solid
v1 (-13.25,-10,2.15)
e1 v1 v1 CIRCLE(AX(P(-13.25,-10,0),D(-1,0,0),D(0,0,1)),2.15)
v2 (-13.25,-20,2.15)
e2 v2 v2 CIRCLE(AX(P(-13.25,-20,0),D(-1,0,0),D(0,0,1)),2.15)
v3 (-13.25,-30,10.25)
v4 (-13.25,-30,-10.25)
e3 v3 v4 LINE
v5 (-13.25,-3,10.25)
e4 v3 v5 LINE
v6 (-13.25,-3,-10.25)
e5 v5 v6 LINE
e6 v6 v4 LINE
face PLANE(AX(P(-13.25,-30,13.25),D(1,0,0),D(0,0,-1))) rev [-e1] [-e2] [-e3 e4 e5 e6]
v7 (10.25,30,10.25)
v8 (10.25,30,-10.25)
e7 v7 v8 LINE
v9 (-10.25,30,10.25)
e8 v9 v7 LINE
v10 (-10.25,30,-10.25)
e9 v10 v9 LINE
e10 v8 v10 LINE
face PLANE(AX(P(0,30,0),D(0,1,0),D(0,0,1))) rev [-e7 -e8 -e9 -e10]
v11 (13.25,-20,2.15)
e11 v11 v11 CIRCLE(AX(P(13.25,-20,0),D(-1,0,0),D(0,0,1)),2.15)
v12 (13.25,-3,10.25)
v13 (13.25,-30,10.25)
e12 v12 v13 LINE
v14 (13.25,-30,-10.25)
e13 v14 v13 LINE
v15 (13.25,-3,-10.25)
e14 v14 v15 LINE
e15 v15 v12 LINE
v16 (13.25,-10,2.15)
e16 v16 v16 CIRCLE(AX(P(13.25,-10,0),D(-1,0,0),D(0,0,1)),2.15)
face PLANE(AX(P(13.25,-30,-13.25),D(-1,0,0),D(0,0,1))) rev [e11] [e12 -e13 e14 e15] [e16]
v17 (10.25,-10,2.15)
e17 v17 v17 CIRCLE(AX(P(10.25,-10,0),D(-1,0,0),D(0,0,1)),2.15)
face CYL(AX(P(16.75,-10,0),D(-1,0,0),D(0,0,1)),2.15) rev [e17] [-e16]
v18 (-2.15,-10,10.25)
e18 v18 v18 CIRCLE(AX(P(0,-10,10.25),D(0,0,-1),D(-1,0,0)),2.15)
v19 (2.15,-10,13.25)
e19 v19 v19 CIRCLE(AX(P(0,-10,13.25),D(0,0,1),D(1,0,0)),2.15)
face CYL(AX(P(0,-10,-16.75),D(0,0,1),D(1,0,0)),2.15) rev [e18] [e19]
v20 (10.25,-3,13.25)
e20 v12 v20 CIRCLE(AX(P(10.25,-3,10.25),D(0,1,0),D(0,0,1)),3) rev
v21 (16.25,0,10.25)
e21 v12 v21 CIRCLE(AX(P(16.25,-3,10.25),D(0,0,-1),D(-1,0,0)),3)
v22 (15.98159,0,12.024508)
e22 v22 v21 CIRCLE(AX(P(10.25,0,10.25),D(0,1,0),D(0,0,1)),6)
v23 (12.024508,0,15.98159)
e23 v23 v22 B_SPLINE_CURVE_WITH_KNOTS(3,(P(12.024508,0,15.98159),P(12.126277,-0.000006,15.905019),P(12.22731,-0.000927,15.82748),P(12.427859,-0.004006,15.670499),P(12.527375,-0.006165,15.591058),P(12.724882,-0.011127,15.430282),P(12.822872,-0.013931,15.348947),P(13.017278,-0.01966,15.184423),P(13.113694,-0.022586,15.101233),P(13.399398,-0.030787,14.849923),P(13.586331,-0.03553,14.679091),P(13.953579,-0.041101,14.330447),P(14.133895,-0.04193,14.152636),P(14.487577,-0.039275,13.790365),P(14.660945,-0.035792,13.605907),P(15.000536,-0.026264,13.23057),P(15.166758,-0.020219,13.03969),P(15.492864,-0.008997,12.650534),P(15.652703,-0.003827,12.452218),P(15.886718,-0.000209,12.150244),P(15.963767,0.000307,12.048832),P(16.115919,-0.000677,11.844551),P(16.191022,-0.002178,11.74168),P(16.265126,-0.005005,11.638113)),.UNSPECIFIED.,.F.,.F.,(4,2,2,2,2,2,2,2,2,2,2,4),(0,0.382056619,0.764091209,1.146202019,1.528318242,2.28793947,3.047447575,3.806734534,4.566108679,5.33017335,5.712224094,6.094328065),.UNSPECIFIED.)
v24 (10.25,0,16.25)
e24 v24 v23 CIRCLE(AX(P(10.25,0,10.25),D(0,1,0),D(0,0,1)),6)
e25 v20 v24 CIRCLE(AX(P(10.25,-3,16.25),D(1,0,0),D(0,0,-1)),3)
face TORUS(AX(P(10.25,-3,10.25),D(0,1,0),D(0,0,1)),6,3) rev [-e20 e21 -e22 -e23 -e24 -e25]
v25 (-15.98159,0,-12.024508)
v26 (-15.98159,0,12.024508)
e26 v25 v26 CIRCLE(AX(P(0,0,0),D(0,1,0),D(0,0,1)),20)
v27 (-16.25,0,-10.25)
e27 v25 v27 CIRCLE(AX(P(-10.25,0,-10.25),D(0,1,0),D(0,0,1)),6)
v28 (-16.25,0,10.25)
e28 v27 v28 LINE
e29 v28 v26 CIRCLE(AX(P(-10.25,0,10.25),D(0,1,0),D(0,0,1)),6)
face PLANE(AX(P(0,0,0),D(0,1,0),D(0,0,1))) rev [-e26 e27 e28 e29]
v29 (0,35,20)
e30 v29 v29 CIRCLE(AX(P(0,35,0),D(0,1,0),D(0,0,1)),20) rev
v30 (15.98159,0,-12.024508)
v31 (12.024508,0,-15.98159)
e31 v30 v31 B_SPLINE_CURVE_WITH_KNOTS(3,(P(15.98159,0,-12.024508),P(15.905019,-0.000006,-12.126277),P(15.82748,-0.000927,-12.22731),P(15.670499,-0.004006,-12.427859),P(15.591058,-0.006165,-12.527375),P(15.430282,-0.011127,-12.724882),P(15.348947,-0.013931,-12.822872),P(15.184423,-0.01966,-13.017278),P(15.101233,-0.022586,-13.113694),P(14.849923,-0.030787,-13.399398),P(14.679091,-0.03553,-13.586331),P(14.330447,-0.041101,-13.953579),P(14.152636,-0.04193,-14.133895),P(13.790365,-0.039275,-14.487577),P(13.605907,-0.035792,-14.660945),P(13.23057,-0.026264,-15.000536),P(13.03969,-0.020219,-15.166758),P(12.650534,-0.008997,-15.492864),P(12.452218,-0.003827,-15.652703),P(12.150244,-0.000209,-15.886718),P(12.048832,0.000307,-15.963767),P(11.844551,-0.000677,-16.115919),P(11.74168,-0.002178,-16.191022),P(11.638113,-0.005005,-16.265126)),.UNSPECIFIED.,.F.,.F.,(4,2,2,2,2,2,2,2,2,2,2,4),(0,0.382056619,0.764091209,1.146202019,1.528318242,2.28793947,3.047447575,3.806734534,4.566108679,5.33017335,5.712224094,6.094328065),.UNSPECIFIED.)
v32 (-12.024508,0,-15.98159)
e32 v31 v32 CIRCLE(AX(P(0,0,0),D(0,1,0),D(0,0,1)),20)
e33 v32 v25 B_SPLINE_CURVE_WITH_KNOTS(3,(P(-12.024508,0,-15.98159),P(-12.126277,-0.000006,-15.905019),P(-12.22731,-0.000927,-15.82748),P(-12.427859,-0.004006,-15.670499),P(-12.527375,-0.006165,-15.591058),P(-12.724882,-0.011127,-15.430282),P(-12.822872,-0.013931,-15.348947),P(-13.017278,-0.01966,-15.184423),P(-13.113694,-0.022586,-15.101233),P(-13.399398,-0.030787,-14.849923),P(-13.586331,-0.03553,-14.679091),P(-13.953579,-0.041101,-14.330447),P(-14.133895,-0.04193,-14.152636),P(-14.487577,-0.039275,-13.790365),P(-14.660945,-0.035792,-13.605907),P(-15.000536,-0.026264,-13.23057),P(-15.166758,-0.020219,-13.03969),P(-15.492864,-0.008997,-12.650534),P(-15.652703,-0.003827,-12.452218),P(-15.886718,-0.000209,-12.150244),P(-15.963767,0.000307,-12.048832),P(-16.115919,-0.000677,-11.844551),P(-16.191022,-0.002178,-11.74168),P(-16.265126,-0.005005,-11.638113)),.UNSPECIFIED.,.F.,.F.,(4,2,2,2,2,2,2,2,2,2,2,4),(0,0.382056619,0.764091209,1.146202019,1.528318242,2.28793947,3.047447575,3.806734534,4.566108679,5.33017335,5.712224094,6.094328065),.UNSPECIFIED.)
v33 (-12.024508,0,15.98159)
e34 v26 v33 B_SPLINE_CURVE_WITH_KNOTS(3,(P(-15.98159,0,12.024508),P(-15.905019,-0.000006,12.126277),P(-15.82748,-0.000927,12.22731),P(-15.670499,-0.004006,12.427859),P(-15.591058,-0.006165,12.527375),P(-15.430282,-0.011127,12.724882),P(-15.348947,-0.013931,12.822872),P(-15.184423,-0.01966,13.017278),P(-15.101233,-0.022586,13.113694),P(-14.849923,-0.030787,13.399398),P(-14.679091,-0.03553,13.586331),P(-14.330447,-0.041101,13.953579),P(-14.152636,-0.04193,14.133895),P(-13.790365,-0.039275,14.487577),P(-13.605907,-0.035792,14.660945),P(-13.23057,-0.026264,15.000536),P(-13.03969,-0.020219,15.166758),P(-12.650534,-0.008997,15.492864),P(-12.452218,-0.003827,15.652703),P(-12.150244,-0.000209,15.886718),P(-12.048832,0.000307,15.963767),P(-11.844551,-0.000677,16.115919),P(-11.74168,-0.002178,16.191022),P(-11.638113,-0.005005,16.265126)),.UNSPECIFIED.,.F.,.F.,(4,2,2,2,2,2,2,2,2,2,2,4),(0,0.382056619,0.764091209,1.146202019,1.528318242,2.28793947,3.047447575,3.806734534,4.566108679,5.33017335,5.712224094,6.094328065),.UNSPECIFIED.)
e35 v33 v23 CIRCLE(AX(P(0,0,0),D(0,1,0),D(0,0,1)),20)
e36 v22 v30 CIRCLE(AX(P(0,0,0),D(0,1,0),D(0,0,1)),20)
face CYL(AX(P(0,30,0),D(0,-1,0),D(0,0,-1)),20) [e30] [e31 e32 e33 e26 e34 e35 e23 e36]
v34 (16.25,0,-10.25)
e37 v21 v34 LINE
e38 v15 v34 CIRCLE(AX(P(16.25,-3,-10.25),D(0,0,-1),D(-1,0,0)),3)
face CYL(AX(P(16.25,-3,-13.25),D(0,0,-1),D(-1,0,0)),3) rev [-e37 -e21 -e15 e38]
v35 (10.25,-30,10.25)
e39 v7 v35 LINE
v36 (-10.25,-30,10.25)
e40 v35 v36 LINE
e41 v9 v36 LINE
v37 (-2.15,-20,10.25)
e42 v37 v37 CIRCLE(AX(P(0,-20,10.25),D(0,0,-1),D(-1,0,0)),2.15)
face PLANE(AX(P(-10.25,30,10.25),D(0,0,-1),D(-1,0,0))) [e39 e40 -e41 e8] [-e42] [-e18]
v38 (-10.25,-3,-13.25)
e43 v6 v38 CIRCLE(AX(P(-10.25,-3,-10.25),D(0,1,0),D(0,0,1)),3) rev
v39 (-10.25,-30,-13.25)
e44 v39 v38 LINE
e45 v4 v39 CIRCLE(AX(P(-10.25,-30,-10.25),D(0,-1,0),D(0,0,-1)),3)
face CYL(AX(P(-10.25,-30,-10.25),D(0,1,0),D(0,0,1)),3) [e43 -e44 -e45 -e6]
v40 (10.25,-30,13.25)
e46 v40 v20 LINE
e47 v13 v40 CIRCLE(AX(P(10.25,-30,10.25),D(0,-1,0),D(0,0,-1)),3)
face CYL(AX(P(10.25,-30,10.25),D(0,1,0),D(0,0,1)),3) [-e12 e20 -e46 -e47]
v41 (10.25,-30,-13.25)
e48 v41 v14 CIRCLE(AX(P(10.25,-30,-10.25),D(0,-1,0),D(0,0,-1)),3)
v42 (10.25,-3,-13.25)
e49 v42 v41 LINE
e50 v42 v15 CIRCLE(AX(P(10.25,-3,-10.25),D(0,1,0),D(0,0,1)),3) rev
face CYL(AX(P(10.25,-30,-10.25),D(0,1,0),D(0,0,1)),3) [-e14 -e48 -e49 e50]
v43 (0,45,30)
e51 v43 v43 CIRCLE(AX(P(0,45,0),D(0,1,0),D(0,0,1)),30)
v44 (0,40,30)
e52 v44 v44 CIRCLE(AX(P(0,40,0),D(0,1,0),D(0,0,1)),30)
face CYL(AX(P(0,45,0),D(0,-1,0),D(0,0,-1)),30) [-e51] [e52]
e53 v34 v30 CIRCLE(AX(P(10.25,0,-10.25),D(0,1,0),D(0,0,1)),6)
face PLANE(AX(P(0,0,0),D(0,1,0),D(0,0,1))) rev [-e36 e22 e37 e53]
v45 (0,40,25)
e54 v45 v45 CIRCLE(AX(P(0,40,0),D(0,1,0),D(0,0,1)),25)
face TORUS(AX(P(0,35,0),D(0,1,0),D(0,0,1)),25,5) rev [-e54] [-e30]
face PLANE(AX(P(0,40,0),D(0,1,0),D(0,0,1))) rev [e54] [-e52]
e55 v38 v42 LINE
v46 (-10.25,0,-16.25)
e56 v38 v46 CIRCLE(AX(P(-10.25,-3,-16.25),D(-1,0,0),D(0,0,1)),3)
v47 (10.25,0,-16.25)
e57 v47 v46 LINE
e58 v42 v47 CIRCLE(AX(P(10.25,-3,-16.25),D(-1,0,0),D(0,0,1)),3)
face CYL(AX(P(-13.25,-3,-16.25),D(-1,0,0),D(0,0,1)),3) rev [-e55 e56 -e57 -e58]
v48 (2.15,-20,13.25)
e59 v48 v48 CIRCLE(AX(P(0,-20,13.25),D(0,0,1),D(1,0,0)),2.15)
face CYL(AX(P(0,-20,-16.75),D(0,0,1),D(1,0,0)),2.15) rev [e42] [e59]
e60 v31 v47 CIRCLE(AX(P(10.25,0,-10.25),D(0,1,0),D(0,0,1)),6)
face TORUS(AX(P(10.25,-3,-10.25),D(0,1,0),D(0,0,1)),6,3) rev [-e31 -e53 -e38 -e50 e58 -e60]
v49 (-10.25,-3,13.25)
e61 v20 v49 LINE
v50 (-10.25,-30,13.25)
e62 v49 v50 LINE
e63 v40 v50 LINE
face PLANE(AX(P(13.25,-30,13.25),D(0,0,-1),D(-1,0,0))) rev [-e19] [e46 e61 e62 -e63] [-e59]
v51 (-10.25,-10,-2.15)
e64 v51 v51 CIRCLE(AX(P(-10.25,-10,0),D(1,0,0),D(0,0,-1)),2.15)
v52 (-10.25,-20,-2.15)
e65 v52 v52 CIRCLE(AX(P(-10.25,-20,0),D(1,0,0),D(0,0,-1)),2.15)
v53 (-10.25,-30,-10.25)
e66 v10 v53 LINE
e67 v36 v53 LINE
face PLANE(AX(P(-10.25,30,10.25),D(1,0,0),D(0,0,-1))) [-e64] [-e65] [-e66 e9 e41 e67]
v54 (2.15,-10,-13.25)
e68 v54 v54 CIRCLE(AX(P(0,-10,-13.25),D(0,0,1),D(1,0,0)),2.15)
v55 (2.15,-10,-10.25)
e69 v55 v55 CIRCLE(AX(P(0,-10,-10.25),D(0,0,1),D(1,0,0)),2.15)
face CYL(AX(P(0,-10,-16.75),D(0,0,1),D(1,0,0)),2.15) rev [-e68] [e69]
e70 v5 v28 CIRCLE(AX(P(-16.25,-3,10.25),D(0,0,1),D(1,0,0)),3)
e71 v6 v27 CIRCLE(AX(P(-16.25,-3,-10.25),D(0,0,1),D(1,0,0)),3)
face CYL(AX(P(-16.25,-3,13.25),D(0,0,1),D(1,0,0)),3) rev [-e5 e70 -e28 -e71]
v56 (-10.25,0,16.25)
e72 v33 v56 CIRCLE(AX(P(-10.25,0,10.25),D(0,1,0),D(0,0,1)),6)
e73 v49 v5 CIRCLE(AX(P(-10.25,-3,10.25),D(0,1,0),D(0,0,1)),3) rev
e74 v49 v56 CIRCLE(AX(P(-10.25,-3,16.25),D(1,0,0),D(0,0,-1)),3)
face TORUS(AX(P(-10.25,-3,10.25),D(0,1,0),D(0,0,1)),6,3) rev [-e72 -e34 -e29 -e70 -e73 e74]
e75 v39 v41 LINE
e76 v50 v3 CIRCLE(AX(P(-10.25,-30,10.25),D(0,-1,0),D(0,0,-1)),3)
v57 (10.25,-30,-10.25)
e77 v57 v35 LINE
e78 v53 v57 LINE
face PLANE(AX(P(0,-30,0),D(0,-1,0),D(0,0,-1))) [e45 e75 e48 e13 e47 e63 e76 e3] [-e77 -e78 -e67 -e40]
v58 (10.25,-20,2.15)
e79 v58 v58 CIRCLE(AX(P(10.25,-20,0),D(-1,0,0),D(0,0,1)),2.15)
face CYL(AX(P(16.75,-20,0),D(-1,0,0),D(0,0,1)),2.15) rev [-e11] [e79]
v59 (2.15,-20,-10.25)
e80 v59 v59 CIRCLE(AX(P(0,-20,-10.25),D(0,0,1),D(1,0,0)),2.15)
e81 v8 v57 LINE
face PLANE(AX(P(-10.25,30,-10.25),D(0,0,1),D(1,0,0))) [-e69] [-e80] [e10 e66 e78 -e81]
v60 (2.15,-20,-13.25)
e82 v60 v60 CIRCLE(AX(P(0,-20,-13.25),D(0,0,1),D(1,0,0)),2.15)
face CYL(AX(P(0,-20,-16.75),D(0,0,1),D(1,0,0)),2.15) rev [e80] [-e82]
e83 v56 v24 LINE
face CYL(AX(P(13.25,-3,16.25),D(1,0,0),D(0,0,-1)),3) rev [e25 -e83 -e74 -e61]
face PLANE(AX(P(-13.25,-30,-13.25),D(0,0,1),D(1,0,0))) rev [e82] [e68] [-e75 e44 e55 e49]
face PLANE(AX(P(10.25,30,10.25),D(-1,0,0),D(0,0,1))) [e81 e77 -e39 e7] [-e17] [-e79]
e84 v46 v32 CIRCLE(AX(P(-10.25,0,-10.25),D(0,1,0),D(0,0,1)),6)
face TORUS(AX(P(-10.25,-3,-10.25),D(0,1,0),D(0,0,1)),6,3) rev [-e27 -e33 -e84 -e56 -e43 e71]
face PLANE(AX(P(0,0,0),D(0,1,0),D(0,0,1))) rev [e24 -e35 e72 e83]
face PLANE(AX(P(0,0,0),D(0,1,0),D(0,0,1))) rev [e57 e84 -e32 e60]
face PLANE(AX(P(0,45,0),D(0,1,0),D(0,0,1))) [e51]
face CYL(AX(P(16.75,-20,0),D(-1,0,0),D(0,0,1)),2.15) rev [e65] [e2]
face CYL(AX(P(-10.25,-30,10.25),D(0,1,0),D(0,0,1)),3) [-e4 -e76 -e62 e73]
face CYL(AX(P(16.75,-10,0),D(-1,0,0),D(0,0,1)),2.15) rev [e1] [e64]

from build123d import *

# Parameters (mm, degrees)
SKETCH_1_R          = 20
SKETCH_1_W          = 20.5
SKETCH_1_H          = 20.5
EXTRUDE_1_DEPTH     = 30
SKETCH_5_R          = 20
EXTRUDE_3_DEPTH     = 10
SKETCH_3_W          = 26.5
SKETCH_3_H          = 26.5
SKETCH_3_W_2        = 20.5
SKETCH_3_H_2        = 20.5
EXTRUDE_4_DEPTH     = 30
SKETCH_6_R          = 2.15
CUT_EXTRUDE_1_DEPTH = 30
SKETCH_7_R          = 2.15
CUT_EXTRUDE_2_DEPTH = 30
FILLET_1_R          = 3
FILLET_2_R          = 3
FILLET_3_R          = 3
FILLET_4_R          = 3
FILLET_5_R          = 3
SKETCH_11_R         = 30
EXTRUDE_5_DEPTH     = 5
FILLET_6_R          = 5


with BuildPart() as part:
    # 草图1 → 凸台-拉伸1 (new body)
    with BuildSketch(Plane(origin=(0, 0, 0), x_dir=(1, 0, 0), z_dir=(0, 1, 0))):
        with Locations(Location((0, 0, 0), (0, 0, 270))):
            Circle(SKETCH_1_R)
        Rectangle(SKETCH_1_W, SKETCH_1_H, mode=Mode.SUBTRACT)
    extrude(amount=EXTRUDE_1_DEPTH)

    # 草图5 → 凸台-拉伸3 (add)
    with BuildSketch(Plane(origin=(0, 30, 0), x_dir=(1, 0, 0), z_dir=(0, 1, 0))):
        with Locations(Location((0, 0, 0), (0, 0, 270))):
            Circle(SKETCH_5_R)
    extrude(amount=EXTRUDE_3_DEPTH)

    # 草图3 → 凸台-拉伸4 (add)
    with BuildSketch(Plane.XZ):
        Rectangle(SKETCH_3_W, SKETCH_3_H)
        Rectangle(SKETCH_3_W_2, SKETCH_3_H_2, mode=Mode.SUBTRACT)
    extrude(amount=EXTRUDE_4_DEPTH)

    # 草图6 → 切除-拉伸1 (cut)
    with BuildSketch(Plane.XY.offset(13.25)):
        with Locations((0, -10)):
            Circle(SKETCH_6_R)
        with Locations((0, -20)):
            Circle(SKETCH_6_R)
    extrude(amount=-CUT_EXTRUDE_1_DEPTH, mode=Mode.SUBTRACT)

    # 草图7 → 切除-拉伸2 (cut)
    with BuildSketch(Plane.ZY.offset(13.25)):
        with Locations((0, -10)):
            Circle(SKETCH_7_R)
        with Locations((0, -20)):
            Circle(SKETCH_7_R)
    extrude(amount=-CUT_EXTRUDE_2_DEPTH, mode=Mode.SUBTRACT)

    # 圆角1
    fillet_1_edges = [part.edges().sort_by_distance(p)[0] for p in [
        (-13.25, -15, 13.25),
    ]]
    fillet(fillet_1_edges, radius=FILLET_1_R)

    # 圆角2
    fillet_2_edges = [part.edges().sort_by_distance(p)[0] for p in [
        (13.25, -15, 13.25),
    ]]
    fillet(fillet_2_edges, radius=FILLET_2_R)

    # 圆角3
    fillet_3_edges = [part.edges().sort_by_distance(p)[0] for p in [
        (13.25, -15, -13.25),
    ]]
    fillet(fillet_3_edges, radius=FILLET_3_R)

    # 圆角4
    fillet_4_edges = [part.edges().sort_by_distance(p)[0] for p in [
        (-13.25, -15, -13.25),
    ]]
    fillet(fillet_4_edges, radius=FILLET_4_R)

    # 圆角5
    # the kernel refuses this fillet: 3 mm, written as the material it adds along each edge
    with BuildSketch(Plane(origin=(10.25, 0, 13.25), x_dir=(0, 0, 1), z_dir=(-1, 0, 0)), Plane(origin=(13.25, 0, -10.25), x_dir=(1, 0, 0), z_dir=(0, 0, 1)), Plane(origin=(-10.25, 0, -13.25), x_dir=(0, 0, -1), z_dir=(1, 0, 0)), Plane(origin=(-13.25, 0, 10.25), x_dir=(-1, 0, 0), z_dir=(0, 0, -1))) as fillet_5_piece_1:
        with BuildLine():
            CenterArc((FILLET_5_R, -FILLET_5_R), FILLET_5_R, 90, 90)
            Line((0, -FILLET_5_R), (0, 0))
            Line((0, 0), (FILLET_5_R, 0))
        make_face()
    extrude(amount=20.5)
    with BuildSketch(Plane(origin=(10.25, 0, 10.25), x_dir=(0, 0, 1), z_dir=(-1, 0, 0))) as fillet_5_piece_2_section:
        with BuildLine():
            CenterArc((3 + FILLET_5_R, -FILLET_5_R), FILLET_5_R, 90, 90)
            Line((3, -FILLET_5_R), (3, 0))
            Line((3, 0), (3 + FILLET_5_R, 0))
        make_face()
    fillet_5_piece_2 = revolve(axis=Axis((10.25, 0, 10.25), (0, 1, 0)), revolution_arc=90, mode=Mode.PRIVATE)
    fillet_5_piece_2 = fillet_5_piece_2 & Plane(origin=(0, -0.618331703, 0), x_dir=(0, 0, 1), z_dir=(0, -1, 0)) * Cylinder(20, 24, mode=Mode.PRIVATE)
    add(fillet_5_piece_2)
    with BuildSketch(Plane(origin=(10.25, 0, -10.25), x_dir=(1, 0, 0), z_dir=(0, 0, 1))) as fillet_5_piece_3_section:
        with BuildLine():
            CenterArc((3 + FILLET_5_R, -FILLET_5_R), FILLET_5_R, 90, 90)
            Line((3, -FILLET_5_R), (3, 0))
            Line((3, 0), (3 + FILLET_5_R, 0))
        make_face()
    fillet_5_piece_3 = revolve(axis=Axis((10.25, 0, -10.25), (0, 1, 0)), revolution_arc=90, mode=Mode.PRIVATE)
    fillet_5_piece_3 = fillet_5_piece_3 & Plane(origin=(0, -0.618331703, 0), x_dir=(0, 0, 1), z_dir=(0, -1, 0)) * Cylinder(20, 24, mode=Mode.PRIVATE)
    add(fillet_5_piece_3)
    with BuildSketch(Plane(origin=(-10.25, 0, -10.25), x_dir=(0, 0, -1), z_dir=(1, 0, 0))) as fillet_5_piece_4_section:
        with BuildLine():
            CenterArc((3 + FILLET_5_R, -FILLET_5_R), FILLET_5_R, 90, 90)
            Line((3, -FILLET_5_R), (3, 0))
            Line((3, 0), (3 + FILLET_5_R, 0))
        make_face()
    fillet_5_piece_4 = revolve(axis=Axis((-10.25, 0, -10.25), (0, 1, 0)), revolution_arc=90, mode=Mode.PRIVATE)
    fillet_5_piece_4 = fillet_5_piece_4 & Plane(origin=(0, -0.618331703, 0), x_dir=(0, 0, 1), z_dir=(0, -1, 0)) * Cylinder(20, 24, mode=Mode.PRIVATE)
    add(fillet_5_piece_4)
    with BuildSketch(Plane(origin=(-10.25, 0, 10.25), x_dir=(-1, 0, 0), z_dir=(0, 0, -1))) as fillet_5_piece_5_section:
        with BuildLine():
            CenterArc((3 + FILLET_5_R, -FILLET_5_R), FILLET_5_R, 90, 90)
            Line((3, -FILLET_5_R), (3, 0))
            Line((3, 0), (3 + FILLET_5_R, 0))
        make_face()
    fillet_5_piece_5 = revolve(axis=Axis((-10.25, 0, 10.25), (0, 1, 0)), revolution_arc=90, mode=Mode.PRIVATE)
    fillet_5_piece_5 = fillet_5_piece_5 & Plane(origin=(0, -0.618331703, 0), x_dir=(0, 0, 1), z_dir=(0, -1, 0)) * Cylinder(20, 24, mode=Mode.PRIVATE)
    add(fillet_5_piece_5)

    # 草图11 → 凸台-拉伸5 (add)
    with BuildSketch(Plane(origin=(0, 40, 0), x_dir=(1, 0, 0), z_dir=(0, 1, 0))):
        with Locations(Location((0, 0, 0), (0, 0, 270))):
            Circle(SKETCH_11_R)
    extrude(amount=EXTRUDE_5_DEPTH)

    # 圆角6
    fillet_6_edges = [part.edges().sort_by_distance(p)[0] for p in [
        (0, 40, -20),
    ]]
    fillet(fillet_6_edges, radius=FILLET_6_R)


solid = part.part
